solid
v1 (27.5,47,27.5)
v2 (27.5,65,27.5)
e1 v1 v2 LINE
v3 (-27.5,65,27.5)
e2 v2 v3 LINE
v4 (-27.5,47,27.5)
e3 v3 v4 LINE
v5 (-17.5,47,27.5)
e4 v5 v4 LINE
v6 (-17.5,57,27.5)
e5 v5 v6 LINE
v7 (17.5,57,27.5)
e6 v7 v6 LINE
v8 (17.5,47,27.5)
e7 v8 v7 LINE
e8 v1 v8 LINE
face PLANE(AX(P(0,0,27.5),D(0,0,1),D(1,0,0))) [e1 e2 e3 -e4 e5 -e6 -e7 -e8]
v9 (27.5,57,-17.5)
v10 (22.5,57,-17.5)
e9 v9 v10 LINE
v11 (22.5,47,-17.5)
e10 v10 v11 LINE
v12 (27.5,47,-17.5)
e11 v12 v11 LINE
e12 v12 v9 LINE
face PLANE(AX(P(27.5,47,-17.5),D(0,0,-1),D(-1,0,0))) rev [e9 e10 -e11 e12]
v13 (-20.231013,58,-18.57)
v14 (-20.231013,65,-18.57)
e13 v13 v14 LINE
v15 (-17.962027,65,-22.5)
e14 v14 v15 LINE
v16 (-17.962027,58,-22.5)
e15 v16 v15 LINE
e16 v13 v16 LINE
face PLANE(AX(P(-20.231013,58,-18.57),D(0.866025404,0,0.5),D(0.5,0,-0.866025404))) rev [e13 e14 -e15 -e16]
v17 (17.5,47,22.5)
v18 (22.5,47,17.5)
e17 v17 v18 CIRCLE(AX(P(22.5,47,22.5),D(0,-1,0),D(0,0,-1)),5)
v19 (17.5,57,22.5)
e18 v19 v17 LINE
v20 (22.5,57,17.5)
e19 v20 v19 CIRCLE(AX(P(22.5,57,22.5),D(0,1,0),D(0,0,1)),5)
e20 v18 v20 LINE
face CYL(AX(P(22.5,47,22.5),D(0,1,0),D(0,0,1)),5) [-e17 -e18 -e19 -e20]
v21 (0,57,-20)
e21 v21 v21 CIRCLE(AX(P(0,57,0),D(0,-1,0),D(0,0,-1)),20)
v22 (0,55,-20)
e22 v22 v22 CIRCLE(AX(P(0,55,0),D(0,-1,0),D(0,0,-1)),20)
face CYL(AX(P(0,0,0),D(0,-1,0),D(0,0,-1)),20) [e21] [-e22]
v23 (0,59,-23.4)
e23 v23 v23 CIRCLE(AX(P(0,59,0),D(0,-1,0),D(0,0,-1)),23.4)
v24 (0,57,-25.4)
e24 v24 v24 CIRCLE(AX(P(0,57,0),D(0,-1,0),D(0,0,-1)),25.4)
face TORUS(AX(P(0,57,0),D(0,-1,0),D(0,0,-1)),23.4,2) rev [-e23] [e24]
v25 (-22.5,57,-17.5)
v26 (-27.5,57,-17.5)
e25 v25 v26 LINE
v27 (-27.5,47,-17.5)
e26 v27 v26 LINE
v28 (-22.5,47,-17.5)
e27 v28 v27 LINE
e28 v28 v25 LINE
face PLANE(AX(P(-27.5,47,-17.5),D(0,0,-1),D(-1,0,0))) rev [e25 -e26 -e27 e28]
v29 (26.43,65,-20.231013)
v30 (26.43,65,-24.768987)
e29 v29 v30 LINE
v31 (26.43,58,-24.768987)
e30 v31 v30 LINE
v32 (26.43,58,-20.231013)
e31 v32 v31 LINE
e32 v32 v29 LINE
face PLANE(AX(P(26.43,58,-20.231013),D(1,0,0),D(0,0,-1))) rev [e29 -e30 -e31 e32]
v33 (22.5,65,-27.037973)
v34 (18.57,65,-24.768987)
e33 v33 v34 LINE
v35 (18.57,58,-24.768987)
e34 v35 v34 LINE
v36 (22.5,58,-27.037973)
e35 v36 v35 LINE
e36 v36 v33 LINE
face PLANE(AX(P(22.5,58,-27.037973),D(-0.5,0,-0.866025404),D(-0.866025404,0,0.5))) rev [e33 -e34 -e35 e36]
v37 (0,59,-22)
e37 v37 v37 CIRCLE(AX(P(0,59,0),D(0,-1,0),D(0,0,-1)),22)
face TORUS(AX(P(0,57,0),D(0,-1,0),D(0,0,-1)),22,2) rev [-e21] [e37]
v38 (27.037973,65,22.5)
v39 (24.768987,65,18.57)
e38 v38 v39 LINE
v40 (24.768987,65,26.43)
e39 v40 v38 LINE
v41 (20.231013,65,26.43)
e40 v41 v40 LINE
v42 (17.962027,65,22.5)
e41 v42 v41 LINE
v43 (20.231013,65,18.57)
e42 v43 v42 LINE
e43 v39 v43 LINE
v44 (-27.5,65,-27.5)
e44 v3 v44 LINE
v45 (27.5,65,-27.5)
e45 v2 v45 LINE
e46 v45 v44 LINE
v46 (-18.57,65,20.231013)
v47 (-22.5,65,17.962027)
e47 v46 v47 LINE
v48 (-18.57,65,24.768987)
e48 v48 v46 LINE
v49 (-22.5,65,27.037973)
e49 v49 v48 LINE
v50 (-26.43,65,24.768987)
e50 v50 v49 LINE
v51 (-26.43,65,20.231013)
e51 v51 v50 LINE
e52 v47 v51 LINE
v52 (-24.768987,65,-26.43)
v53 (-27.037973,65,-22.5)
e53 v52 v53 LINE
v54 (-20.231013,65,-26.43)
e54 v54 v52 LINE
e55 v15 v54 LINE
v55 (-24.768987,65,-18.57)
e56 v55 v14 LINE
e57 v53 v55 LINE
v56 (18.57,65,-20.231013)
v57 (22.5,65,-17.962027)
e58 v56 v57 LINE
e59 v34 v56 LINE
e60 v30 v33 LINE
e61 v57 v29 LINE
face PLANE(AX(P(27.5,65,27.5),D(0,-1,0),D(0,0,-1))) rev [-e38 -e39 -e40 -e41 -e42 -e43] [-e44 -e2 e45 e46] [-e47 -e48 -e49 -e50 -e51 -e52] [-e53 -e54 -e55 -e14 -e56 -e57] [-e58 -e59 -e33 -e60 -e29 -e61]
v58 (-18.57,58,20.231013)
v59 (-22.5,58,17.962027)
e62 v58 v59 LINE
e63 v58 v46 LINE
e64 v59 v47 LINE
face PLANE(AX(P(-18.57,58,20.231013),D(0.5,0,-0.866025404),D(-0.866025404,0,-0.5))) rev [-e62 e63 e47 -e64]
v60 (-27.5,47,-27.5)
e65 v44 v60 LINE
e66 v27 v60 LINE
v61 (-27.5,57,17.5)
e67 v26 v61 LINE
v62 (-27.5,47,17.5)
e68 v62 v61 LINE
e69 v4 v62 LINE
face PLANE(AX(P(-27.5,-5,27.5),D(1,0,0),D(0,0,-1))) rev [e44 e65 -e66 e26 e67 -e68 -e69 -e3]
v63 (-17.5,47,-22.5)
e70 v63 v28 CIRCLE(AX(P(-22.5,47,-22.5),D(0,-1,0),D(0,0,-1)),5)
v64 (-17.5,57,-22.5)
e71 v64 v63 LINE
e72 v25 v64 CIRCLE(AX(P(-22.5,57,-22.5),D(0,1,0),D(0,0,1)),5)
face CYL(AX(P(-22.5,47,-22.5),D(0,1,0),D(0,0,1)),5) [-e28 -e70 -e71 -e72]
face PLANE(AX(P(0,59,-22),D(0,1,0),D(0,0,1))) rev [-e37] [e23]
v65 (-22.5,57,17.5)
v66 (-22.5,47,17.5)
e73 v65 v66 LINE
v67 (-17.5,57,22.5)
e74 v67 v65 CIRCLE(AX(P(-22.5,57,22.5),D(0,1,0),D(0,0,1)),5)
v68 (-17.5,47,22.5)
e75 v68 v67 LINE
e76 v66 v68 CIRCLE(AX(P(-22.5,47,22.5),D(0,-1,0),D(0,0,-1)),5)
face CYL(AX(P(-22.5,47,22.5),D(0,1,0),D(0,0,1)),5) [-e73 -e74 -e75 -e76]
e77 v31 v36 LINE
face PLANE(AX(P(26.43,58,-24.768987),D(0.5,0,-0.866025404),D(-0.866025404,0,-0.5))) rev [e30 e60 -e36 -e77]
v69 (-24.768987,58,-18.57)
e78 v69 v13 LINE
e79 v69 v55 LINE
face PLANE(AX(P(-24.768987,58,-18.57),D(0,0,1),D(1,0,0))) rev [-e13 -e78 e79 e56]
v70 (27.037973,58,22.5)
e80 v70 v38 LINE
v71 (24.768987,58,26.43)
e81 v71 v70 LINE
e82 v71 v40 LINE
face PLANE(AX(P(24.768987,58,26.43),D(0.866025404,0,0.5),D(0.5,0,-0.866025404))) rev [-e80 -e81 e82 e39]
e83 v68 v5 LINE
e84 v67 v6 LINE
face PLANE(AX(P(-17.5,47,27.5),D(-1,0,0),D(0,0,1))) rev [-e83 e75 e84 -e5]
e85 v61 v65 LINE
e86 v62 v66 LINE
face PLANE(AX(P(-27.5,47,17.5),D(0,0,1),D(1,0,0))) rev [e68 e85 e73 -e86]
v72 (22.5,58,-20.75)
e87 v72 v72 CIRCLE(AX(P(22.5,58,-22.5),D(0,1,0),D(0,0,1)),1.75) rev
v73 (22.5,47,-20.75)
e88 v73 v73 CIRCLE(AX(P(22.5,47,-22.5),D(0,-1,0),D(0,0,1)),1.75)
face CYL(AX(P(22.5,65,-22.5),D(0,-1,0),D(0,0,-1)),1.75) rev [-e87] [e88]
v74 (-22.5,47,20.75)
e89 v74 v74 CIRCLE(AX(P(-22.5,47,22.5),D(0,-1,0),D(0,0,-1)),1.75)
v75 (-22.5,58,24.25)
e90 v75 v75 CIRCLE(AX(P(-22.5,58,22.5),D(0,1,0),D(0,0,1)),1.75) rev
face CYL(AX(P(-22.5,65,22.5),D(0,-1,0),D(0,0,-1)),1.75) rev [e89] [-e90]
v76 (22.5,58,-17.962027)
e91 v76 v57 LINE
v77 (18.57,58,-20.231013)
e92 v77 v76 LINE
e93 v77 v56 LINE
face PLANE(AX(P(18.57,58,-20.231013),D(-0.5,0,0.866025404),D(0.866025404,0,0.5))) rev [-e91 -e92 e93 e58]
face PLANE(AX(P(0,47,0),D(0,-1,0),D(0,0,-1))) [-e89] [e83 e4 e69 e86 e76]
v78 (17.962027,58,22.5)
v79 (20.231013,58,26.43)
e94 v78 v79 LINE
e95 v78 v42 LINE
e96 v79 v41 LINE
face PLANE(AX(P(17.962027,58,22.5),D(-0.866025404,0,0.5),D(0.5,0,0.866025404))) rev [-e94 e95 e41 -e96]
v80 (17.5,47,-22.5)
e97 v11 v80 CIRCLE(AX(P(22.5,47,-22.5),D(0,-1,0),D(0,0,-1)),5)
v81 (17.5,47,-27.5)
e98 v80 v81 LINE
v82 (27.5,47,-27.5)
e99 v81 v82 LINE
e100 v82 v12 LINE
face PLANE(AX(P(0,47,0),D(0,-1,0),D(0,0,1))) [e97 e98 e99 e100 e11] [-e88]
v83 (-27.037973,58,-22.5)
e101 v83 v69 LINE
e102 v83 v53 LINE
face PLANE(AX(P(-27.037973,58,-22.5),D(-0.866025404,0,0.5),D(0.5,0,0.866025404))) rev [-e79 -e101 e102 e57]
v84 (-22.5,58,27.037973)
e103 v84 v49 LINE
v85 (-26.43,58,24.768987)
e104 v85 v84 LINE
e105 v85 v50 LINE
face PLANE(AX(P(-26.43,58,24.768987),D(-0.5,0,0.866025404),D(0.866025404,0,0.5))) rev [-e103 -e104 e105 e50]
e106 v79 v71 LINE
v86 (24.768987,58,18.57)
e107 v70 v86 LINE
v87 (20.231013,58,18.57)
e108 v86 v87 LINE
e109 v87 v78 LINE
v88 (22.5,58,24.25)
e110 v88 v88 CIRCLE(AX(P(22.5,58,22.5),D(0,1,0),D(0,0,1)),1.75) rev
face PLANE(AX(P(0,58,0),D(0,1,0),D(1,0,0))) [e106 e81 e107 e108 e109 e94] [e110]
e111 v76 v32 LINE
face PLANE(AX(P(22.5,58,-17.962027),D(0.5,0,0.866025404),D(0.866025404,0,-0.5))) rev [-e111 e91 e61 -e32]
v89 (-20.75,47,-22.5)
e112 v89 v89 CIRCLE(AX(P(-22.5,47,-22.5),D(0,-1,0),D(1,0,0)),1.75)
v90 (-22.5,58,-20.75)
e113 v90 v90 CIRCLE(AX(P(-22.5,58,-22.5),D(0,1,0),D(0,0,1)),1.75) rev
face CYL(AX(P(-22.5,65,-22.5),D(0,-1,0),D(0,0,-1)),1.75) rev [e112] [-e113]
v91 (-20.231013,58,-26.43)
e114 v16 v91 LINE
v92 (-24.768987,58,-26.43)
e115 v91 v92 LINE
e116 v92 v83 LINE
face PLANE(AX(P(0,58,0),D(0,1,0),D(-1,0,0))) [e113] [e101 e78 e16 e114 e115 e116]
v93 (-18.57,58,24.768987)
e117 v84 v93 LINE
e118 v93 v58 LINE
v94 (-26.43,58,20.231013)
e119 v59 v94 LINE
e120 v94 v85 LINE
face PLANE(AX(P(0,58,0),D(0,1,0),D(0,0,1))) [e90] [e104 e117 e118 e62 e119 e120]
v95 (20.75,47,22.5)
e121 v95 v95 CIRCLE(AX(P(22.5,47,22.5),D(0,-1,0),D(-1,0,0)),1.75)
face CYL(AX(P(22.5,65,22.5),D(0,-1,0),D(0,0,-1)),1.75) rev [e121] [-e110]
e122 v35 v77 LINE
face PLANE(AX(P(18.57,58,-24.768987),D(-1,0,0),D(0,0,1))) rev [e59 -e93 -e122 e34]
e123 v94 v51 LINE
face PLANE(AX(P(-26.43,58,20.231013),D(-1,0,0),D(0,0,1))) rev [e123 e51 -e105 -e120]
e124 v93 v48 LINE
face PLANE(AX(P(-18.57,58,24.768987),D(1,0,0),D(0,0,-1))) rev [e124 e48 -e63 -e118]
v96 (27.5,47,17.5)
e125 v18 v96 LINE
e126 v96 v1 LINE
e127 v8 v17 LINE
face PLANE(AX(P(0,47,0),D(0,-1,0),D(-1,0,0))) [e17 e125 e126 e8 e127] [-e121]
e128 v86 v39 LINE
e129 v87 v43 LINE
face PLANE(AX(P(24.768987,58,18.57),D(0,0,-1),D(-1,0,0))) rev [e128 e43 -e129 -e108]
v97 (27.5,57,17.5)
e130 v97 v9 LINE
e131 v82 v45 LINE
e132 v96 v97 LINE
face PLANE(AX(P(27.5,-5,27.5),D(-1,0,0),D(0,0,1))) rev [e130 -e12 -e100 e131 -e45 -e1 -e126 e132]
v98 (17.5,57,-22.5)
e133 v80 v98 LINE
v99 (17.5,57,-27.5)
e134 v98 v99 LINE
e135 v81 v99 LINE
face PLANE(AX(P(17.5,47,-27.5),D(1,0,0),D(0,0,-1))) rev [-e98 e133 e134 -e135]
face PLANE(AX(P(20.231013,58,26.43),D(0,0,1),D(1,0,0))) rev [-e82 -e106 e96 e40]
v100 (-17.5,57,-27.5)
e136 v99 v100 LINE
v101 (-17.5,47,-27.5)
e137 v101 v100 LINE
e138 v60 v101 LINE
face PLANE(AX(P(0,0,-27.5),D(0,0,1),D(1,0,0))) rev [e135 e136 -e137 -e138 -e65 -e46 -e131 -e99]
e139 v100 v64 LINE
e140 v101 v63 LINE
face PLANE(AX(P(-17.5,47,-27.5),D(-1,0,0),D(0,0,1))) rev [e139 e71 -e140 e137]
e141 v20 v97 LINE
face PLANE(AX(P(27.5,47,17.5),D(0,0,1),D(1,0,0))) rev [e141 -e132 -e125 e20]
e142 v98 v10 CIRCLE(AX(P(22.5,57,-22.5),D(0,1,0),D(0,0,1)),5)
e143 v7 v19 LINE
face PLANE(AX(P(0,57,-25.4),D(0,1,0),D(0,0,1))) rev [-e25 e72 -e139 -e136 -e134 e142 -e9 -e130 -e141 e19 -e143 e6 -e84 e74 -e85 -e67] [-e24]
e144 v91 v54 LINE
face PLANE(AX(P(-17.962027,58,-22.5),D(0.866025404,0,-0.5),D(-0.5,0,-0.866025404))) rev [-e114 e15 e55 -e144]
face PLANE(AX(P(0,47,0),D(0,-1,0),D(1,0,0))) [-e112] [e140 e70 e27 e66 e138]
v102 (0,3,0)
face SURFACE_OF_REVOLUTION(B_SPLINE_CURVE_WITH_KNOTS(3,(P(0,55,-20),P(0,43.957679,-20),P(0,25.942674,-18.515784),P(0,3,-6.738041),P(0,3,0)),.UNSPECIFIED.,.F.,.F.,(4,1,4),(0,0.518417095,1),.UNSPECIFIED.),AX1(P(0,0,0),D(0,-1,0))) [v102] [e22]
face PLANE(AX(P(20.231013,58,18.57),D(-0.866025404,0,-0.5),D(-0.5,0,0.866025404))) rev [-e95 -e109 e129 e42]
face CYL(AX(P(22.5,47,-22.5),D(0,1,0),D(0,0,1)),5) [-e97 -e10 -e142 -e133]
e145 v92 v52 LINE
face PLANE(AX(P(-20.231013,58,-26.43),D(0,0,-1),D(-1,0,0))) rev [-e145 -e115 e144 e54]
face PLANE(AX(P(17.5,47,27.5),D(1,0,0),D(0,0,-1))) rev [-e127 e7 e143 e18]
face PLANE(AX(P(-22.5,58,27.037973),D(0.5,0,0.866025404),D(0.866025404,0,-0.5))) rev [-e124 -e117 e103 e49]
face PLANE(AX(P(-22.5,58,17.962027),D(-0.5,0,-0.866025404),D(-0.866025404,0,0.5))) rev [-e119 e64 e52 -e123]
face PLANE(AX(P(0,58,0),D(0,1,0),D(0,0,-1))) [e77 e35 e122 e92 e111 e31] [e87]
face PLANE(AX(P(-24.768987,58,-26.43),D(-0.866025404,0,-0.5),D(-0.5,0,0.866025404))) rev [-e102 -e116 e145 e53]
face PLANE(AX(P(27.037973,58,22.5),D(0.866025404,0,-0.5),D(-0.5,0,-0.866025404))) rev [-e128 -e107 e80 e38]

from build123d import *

# Parameters (mm, degrees)
SKETCH5_W           = 55
SKETCH5_H           = 70
BOSS_EXTRUDE8_DEPTH = 27.5
SKETCH6_W           = 10
SKETCH6_H           = 10
BOSS_EXTRUDE9_DEPTH = 10
SKETCH7_R           = 1.75
CUT_EXTRUDE2_DEPTH  = 59.723930461
CUT_EXTRUDE3_DEPTH  = 7
CIRPATTERN1_COUNT   = 4
FILLET1_R           = 5


with BuildPart() as part:
    # Sketch5 → Boss-Extrude8 (new, symmetric)
    with BuildSketch(Plane.XY):
        with Locations((0, 30)):
            Rectangle(SKETCH5_W, SKETCH5_H)
    extrude(amount=BOSS_EXTRUDE8_DEPTH, both=True)

    # Sketch1 → Cut-Revolve1 (revolve, cut)
    with BuildSketch(Plane(origin=(0, 0, 0), x_dir=(0, 0, -1), z_dir=(1, 0, 0))):
        with BuildLine():
            Line((0, -7), (0, 3))
            add(Edge.make_bspline(
                [(20, 55), (20, 43.957678864), (18.5157836, 25.942674232), (6.738040747, 3), (0, 3)],
                knots=[0, 0, 0, 0, 0.518417095, 1, 1, 1, 1], degree=3))
            Line((20, 55), (20, 57))
            ThreePointArc((20, 57), (20.585786438, 58.414213562), (22, 59))
            Line((22, 59), (23.4, 59))
            ThreePointArc((23.4, 59), (24.814213562, 58.414213562), (25.4, 57))
            Line((25.4, 57), (304.80691679, 57))
            Line((304.80691679, 57), (304.80691679, -311.267440696))
            Line((304.80691679, -311.267440696), (0, -311.267440696))
            Line((0, -311.267440696), (0, -7))
        make_face()
    revolve(axis=Axis((0, 0, 0), (0, 1, 0)), mode=Mode.SUBTRACT)

    # Sketch6 → Boss-Extrude9 (add)
    with BuildSketch(Plane.XZ.offset(-57)):
        with Locations((-22.5, 22.5)):
            Rectangle(SKETCH6_W, SKETCH6_H)
    boss_extrude9 = extrude(amount=BOSS_EXTRUDE9_DEPTH)

    # Sketch7 → Cut-Extrude2 (cut, through all)
    with BuildSketch(Plane.XZ.offset(-47)):
        with Locations(Location((-22.5, 22.5, 0), (0, 0, 270))):
            Circle(SKETCH7_R)
    cut_extrude2 = extrude(amount=-CUT_EXTRUDE2_DEPTH, mode=Mode.SUBTRACT)

    # Sketch8 → Cut-Extrude3 (cut)
    with BuildSketch(Plane(origin=(0, 65, 0), x_dir=(1, 0, 0), z_dir=(0, 1, 0))):
        Polygon((-22.5, -17.962026884), (-26.43, -20.231013442), (-26.43, -24.768986558), (-22.5, -27.037973116), (-18.57, -24.768986558), (-18.57, -20.231013442), align=None)
    cut_extrude3 = extrude(amount=-CUT_EXTRUDE3_DEPTH, mode=Mode.SUBTRACT)

    # CirPattern1: Boss-Extrude9, Cut-Extrude2, Cut-Extrude3 ×4 about axis
    cirpattern1_axis = Axis((0, 0, 0), (0, 1, 0))
    add([boss_extrude9.rotate(cirpattern1_axis, i * 360 / CIRPATTERN1_COUNT) for i in range(1, CIRPATTERN1_COUNT)])
    add([cut_extrude2.rotate(cirpattern1_axis, i * 360 / CIRPATTERN1_COUNT) for i in range(1, CIRPATTERN1_COUNT)], mode=Mode.SUBTRACT)
    add([cut_extrude3.rotate(cirpattern1_axis, i * 360 / CIRPATTERN1_COUNT) for i in range(1, CIRPATTERN1_COUNT)], mode=Mode.SUBTRACT)

    # Fillet1
    # the kernel refuses this fillet: 5 mm, written as the material it takes off along each edge
    with BuildSketch(Plane(origin=(-17.5, 57, 17.5), x_dir=(0, 0, 1), z_dir=(0, -1, 0)), Plane(origin=(17.5, 57, 17.5), x_dir=(1, 0, 0), z_dir=(0, -1, 0))) as fillet1_piece_1:
        with BuildLine():
            CenterArc((FILLET1_R, FILLET1_R), FILLET1_R, 180, 90)
            Line((0, FILLET1_R), (0, 0))
            Line((0, 0), (FILLET1_R, 0))
        make_face()
    extrude(amount=22.5, mode=Mode.SUBTRACT)
    with BuildSketch(Plane(origin=(-17.5, 57, -17.5), x_dir=(0, 0, -1), z_dir=(0, -1, 0)), Plane(origin=(17.5, 57, -17.5), x_dir=(1, 0, 0), z_dir=(0, -1, 0))) as fillet1_piece_2:
        with BuildLine():
            CenterArc((FILLET1_R, -FILLET1_R), FILLET1_R, 90, 90)
            Line((0, -FILLET1_R), (0, 0))
            Line((0, 0), (FILLET1_R, 0))
        make_face()
    extrude(amount=22.5, mode=Mode.SUBTRACT)


solid = part.part
